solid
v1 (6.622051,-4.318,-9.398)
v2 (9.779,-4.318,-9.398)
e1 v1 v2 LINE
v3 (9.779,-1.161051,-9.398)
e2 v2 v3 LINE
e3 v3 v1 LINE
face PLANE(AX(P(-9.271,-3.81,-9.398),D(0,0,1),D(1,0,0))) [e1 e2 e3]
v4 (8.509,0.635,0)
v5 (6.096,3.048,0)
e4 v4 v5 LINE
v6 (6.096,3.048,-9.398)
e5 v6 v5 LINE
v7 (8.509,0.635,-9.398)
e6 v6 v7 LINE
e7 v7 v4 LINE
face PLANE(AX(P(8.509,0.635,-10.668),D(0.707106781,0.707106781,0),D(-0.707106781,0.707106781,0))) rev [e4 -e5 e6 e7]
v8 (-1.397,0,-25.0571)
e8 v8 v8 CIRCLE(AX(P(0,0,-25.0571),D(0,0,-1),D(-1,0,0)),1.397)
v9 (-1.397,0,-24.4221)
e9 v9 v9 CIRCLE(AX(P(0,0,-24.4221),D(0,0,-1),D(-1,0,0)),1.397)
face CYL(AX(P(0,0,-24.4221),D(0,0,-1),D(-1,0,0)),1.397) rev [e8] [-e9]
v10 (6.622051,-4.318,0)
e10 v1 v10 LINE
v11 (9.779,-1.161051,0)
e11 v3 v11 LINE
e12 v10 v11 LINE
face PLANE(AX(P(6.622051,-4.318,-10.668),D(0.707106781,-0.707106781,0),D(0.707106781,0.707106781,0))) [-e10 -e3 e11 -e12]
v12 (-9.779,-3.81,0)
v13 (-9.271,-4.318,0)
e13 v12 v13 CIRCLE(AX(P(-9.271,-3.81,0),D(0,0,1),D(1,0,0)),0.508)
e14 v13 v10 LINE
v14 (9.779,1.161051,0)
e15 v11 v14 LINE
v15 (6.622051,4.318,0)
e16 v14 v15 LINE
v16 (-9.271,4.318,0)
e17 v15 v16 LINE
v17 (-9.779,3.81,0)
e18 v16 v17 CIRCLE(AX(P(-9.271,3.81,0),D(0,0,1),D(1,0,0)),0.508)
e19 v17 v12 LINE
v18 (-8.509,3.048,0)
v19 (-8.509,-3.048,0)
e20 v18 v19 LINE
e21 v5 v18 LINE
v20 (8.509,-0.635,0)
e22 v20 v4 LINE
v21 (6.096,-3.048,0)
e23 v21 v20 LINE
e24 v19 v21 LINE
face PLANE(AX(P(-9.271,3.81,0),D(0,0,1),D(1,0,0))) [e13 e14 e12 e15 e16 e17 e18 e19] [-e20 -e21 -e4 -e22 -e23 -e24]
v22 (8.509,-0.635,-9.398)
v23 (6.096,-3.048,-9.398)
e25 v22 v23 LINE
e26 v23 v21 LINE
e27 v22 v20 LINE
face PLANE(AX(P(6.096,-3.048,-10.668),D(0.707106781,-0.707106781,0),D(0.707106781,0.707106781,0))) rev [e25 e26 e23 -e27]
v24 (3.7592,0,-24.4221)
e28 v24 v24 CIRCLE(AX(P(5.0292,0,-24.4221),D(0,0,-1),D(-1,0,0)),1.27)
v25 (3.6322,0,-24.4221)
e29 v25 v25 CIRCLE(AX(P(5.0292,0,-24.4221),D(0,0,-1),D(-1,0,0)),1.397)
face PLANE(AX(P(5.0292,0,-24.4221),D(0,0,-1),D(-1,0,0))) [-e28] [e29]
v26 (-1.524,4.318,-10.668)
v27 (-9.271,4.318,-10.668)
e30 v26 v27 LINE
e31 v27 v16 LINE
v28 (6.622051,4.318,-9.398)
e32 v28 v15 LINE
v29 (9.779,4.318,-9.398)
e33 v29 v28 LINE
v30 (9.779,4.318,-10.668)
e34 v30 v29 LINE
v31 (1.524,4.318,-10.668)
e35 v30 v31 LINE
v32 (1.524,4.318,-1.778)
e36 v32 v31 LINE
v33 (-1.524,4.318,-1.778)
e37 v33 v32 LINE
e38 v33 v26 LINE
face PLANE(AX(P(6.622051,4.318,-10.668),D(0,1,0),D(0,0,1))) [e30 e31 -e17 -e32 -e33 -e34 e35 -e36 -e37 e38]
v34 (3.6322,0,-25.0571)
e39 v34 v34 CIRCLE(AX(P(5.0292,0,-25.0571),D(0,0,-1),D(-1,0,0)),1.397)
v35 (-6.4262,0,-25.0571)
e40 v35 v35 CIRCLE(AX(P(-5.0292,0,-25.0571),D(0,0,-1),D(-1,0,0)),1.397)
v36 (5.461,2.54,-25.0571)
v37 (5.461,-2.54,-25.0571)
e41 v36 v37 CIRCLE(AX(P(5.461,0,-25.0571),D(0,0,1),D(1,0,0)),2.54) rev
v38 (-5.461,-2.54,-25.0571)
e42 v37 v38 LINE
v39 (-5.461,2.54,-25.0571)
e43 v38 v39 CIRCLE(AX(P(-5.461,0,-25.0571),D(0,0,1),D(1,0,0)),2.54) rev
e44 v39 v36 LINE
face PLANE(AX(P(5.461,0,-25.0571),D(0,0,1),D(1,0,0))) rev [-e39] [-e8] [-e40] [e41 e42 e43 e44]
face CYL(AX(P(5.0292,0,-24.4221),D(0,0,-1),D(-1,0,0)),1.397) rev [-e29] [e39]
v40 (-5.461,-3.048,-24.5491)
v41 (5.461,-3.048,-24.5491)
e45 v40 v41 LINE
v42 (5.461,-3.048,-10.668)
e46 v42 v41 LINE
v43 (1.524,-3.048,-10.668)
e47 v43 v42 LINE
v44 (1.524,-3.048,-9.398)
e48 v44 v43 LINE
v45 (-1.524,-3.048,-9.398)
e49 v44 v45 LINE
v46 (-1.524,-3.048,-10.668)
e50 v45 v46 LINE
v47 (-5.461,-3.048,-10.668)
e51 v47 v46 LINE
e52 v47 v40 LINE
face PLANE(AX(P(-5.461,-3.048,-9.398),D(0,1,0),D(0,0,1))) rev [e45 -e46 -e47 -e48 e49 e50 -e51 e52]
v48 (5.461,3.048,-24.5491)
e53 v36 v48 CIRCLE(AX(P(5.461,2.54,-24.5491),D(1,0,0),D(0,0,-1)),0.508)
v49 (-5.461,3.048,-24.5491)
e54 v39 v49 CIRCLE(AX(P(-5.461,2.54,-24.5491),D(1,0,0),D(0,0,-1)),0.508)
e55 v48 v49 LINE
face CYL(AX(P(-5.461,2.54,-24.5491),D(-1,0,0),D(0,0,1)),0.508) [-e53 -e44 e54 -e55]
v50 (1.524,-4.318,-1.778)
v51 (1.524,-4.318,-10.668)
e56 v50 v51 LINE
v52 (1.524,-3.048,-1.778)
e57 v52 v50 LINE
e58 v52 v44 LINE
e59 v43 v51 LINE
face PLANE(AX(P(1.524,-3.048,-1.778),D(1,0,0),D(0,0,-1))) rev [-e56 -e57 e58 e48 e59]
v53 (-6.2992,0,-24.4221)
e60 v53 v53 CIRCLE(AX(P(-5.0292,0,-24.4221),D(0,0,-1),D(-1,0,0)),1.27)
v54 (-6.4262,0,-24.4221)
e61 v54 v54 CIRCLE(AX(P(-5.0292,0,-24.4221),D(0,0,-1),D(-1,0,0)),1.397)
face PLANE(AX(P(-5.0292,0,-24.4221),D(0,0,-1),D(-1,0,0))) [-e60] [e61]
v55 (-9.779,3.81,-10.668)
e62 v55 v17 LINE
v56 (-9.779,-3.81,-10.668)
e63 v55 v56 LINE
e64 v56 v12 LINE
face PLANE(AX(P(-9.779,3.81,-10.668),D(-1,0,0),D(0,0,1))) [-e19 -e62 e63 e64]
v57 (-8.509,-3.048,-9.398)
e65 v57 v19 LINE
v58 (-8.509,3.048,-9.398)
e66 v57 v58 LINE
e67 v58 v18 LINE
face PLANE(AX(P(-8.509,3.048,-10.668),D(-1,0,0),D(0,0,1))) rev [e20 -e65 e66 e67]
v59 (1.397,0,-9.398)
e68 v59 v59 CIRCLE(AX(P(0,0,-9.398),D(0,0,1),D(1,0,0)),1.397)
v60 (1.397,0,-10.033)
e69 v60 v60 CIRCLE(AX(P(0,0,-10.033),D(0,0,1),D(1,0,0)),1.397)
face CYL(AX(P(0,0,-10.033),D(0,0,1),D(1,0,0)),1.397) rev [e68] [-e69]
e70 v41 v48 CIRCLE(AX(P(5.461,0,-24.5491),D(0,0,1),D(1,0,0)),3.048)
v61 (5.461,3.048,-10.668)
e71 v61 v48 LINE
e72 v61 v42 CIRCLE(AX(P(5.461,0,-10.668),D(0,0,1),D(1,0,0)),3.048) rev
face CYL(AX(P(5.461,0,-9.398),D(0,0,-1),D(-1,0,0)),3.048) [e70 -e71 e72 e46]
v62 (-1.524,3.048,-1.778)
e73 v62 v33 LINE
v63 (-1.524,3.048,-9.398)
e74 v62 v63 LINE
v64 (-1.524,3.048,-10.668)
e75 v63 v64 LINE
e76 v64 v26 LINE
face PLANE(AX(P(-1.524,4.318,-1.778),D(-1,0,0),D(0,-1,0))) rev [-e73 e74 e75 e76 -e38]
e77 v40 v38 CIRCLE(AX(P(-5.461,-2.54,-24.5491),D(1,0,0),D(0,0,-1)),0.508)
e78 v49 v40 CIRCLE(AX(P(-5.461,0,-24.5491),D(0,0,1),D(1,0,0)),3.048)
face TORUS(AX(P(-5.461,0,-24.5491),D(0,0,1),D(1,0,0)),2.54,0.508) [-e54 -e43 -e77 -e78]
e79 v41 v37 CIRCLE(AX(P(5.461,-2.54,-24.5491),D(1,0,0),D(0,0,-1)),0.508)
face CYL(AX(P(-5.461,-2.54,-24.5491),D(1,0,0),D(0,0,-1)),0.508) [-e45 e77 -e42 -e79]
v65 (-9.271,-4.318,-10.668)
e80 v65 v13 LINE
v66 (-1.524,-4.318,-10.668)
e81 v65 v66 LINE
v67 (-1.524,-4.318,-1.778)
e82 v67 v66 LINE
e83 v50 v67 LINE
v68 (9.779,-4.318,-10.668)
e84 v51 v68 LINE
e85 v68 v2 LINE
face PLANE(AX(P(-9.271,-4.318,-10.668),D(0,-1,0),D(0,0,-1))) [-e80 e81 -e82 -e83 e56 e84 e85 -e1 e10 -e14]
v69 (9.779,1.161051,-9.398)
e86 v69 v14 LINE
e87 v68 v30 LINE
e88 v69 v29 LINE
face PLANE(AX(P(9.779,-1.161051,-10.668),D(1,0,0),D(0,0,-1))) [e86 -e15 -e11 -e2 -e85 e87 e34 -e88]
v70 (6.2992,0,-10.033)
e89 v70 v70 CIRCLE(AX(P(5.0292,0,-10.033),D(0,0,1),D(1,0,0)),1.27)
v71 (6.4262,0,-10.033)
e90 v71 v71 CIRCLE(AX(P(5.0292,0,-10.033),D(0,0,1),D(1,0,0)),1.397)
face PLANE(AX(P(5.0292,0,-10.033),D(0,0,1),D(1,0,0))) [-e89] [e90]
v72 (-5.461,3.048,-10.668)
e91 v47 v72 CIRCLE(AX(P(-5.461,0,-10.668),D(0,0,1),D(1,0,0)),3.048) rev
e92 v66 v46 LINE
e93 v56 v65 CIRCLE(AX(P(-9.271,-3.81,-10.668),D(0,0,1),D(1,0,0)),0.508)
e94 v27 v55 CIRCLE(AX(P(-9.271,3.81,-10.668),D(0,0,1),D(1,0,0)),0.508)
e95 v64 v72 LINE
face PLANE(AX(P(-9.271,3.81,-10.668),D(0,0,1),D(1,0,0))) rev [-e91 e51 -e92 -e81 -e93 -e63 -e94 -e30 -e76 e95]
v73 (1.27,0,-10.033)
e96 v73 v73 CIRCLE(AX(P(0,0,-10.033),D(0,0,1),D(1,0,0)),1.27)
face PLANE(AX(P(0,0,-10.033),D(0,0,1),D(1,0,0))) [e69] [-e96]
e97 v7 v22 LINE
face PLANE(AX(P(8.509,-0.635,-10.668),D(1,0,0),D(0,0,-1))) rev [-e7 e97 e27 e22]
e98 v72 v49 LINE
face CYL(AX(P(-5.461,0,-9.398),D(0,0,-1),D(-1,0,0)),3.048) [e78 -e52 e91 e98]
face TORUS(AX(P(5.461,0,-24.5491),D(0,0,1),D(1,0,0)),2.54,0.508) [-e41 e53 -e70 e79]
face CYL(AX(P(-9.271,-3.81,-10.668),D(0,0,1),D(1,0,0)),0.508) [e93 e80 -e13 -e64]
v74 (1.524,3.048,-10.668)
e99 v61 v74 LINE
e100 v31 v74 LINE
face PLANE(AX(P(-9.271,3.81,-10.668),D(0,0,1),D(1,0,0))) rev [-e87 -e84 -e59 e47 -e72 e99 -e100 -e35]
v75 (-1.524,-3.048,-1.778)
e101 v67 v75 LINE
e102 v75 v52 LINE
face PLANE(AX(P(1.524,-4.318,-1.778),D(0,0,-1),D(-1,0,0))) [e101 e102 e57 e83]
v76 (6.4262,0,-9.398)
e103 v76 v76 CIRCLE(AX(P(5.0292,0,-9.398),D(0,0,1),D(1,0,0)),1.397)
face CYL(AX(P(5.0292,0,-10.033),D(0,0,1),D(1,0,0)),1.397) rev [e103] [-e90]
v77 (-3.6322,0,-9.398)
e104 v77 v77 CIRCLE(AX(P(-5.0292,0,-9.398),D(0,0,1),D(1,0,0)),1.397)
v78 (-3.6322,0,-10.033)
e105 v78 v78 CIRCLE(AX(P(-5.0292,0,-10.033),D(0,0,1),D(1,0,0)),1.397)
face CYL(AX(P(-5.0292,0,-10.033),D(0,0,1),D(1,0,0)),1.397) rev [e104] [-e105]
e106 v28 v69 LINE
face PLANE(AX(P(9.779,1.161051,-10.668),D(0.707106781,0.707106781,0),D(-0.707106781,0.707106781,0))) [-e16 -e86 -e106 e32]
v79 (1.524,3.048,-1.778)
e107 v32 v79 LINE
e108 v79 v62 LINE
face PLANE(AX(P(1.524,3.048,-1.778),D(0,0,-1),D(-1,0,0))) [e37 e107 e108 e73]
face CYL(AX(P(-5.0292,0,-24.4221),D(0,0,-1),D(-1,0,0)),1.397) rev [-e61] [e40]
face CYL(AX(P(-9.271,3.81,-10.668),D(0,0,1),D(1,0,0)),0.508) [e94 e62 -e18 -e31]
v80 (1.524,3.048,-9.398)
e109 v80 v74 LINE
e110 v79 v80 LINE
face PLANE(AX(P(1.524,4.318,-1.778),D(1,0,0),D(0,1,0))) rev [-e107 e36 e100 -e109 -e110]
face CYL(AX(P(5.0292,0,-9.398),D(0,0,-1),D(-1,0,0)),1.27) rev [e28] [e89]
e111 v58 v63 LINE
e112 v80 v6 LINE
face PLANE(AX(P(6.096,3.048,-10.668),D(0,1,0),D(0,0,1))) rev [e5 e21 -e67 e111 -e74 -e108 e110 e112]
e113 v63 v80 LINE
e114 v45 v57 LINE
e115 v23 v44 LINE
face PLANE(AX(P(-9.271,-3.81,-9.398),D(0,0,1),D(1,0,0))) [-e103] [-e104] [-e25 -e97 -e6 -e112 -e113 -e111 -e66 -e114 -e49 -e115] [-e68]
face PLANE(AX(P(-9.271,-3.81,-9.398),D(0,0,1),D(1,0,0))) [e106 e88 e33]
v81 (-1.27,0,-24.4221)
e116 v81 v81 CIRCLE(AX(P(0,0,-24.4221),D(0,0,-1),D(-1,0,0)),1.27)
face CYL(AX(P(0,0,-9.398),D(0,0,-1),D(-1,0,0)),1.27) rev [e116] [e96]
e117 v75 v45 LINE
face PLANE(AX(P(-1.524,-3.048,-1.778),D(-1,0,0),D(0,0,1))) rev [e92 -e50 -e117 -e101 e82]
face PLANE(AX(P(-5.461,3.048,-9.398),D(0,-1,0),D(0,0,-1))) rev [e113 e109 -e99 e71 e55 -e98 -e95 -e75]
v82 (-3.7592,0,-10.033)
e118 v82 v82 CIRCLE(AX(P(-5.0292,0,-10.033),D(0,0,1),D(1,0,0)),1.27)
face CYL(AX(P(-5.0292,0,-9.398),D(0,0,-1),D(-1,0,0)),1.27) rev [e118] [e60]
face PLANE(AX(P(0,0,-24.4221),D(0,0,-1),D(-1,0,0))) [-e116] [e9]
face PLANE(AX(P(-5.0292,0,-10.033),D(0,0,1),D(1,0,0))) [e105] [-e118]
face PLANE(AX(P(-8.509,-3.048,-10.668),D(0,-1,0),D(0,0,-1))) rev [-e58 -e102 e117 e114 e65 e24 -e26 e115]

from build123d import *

# Parameters (mm, degrees)
BOSS_EXTRUDE1_DEPTH = 10.668
SKETCH2_R           = 1.27
BOSS_EXTRUDE2_DEPTH = 15.6591
BOSS_EXTRUDE3_START = -1.27
BOSS_EXTRUDE3_DEPTH = 1.27
SKETCH4_R           = 1.397
CUT_EXTRUDE1_DEPTH  = 0.635
CUT_EXTRUDE2_START  = -0.635
SKETCH5_R           = 1.397
CUT_EXTRUDE2_DEPTH  = 0.635
SKETCH6_W           = 3.048
SKETCH6_H           = 1.27
CUT_EXTRUDE3_DEPTH  = 8.89
FILLET1_R           = 0.508


# Read off the part's stored shape, not the designer's step: Boss-Extrude3
with BuildPart() as part:
    # Sketch1 → Boss-Extrude1 (new body)
    with BuildSketch(Plane.XY):
        with BuildLine():
            Line((6.622051224, 4.318), (-9.271, 4.318))
            ThreePointArc((-9.271, 4.318), (-9.630210245, 4.169210245), (-9.779, 3.81))
            Line((-9.779, 3.81), (-9.779, -3.81))
            ThreePointArc((-9.779, -3.81), (-9.630210245, -4.169210245), (-9.271, -4.318))
            Line((-9.271, -4.318), (6.622051224, -4.318))
            Line((6.622051224, -4.318), (9.779, -1.161051224))
            Line((9.779, -1.161051224), (9.779, 1.161051224))
            Line((9.779, 1.161051224), (6.622051224, 4.318))
        make_face()
        Polygon((8.509, -0.635), (8.509, 0.635), (6.096, 3.048), (-8.509, 3.048), (-8.509, -3.048), (6.096, -3.048), align=None, mode=Mode.SUBTRACT)
    extrude(amount=-BOSS_EXTRUDE1_DEPTH)



with BuildPart() as body_2:
    # Sketch2 → Boss-Extrude2 (new body)
    with BuildSketch(Plane.XY.offset(-25.0571)):
        with BuildLine():
            Line((-5.461, 3.048), (5.461, 3.048))
            ThreePointArc((5.461, 3.048), (8.509, 0), (5.461, -3.048))
            Line((5.461, -3.048), (-5.461, -3.048))
            ThreePointArc((-5.461, -3.048), (-8.509, 0), (-5.461, 3.048))
        make_face()
        with Locations((-5.0292, 0)):
            Circle(SKETCH2_R, mode=Mode.SUBTRACT)
        with Locations((5.0292, 0)):
            Circle(SKETCH2_R, mode=Mode.SUBTRACT)
        Circle(SKETCH2_R, mode=Mode.SUBTRACT)
    extrude(amount=BOSS_EXTRUDE2_DEPTH)


with BuildPart() as part_1:
    add(part.part)

    add(body_2.part)  # Boss-Extrude3 merges body 2
    # Boss-Extrude3 outline → Boss-Extrude3 (add)
    with BuildSketch(Plane.XY.offset(-9.398).offset(BOSS_EXTRUDE3_START)):
        Polygon((6.622051224, -4.318), (9.779, -4.318), (9.779, -1.161051224), align=None)
        Polygon((6.622051224, 4.318), (9.779, 1.161051224), (9.779, 4.318), align=None)
        with BuildLine():
            Line((5.461, -3.048), (6.096, -3.048))
            Line((6.096, -3.048), (6.182665302, -2.961334698))
            ThreePointArc((6.182665302, -2.961334698), (5.824425262, -3.026256116), (5.461, -3.048))
        make_face()
        with BuildLine():
            ThreePointArc((8.509, 0), (8.487256116, -0.363425262), (8.422334698, -0.721665302))
            Line((8.422334698, -0.721665302), (8.509, -0.635))
            Line((8.509, -0.635), (8.509, 0))
        make_face()
        with BuildLine():
            Line((-8.509, -3.048), (-5.461, -3.048))
            ThreePointArc((-5.461, -3.048), (-7.616261469, -2.155261469), (-8.509, 0))
            Line((-8.509, 0), (-8.509, -3.048))
        make_face()
        with BuildLine():
            ThreePointArc((8.422334698, 0.721665302), (8.487256116, 0.363425262), (8.509, 0))
            Line((8.509, 0), (8.509, 0.635))
            Line((8.509, 0.635), (8.422334698, 0.721665302))
        make_face()
        with BuildLine():
            Line((-8.509, 3.048), (-8.509, 0))
            ThreePointArc((-8.509, 0), (-7.616261469, 2.155261469), (-5.461, 3.048))
            Line((-5.461, 3.048), (-8.509, 3.048))
        make_face()
        with BuildLine():
            ThreePointArc((5.461, 3.048), (5.824425262, 3.026256116), (6.182665302, 2.961334698))
            Line((6.182665302, 2.961334698), (6.096, 3.048))
            Line((6.096, 3.048), (5.461, 3.048))
        make_face()
    extrude(amount=BOSS_EXTRUDE3_DEPTH)

    # Sketch4 → Cut-Extrude1 (cut)
    with BuildSketch(Plane(origin=(0, 0, -25.0571), x_dir=(-1, 0, 0), z_dir=(0, 0, -1))):
        with Locations((-5.0292, 0)):
            Circle(SKETCH4_R)
        with Locations((5.0292, 0)):
            Circle(SKETCH4_R)
        Circle(SKETCH4_R)
    extrude(amount=-CUT_EXTRUDE1_DEPTH, mode=Mode.SUBTRACT)

    # Sketch5 → Cut-Extrude2 (cut)
    with BuildSketch(Plane.XY.offset(-9.398).offset(CUT_EXTRUDE2_START)):
        with Locations(Location((0, 0, 0), (0, 0, 180))):
            Circle(SKETCH5_R)
        with Locations(Location((-5.0292, 0, 0), (0, 0, 180))):
            Circle(SKETCH5_R)
        with Locations(Location((5.0292, 0, 0), (0, 0, 180))):
            Circle(SKETCH5_R)
    extrude(amount=CUT_EXTRUDE2_DEPTH, mode=Mode.SUBTRACT)

    # Sketch6 → Cut-Extrude3 (cut)
    with BuildSketch(Plane(origin=(0, 0, -10.668), x_dir=(-1, 0, 0), z_dir=(0, 0, -1))):
        with Locations((0, 3.683)):
            Rectangle(SKETCH6_W, SKETCH6_H)
        with Locations((0, -3.683)):
            Rectangle(SKETCH6_W, SKETCH6_H)
    extrude(amount=-CUT_EXTRUDE3_DEPTH, mode=Mode.SUBTRACT)

    # Fillet1
    fillet1_edges = [part_1.edges().sort_by_distance(p)[0] for p in [
        (-8.509, 0, -25.0571),
        (0, 3.048, -25.0571),
        (0, -3.048, -25.0571),
        (8.509, 0, -25.0571),
    ]]
    fillet(fillet1_edges, radius=FILLET1_R)


solid = part_1.part
